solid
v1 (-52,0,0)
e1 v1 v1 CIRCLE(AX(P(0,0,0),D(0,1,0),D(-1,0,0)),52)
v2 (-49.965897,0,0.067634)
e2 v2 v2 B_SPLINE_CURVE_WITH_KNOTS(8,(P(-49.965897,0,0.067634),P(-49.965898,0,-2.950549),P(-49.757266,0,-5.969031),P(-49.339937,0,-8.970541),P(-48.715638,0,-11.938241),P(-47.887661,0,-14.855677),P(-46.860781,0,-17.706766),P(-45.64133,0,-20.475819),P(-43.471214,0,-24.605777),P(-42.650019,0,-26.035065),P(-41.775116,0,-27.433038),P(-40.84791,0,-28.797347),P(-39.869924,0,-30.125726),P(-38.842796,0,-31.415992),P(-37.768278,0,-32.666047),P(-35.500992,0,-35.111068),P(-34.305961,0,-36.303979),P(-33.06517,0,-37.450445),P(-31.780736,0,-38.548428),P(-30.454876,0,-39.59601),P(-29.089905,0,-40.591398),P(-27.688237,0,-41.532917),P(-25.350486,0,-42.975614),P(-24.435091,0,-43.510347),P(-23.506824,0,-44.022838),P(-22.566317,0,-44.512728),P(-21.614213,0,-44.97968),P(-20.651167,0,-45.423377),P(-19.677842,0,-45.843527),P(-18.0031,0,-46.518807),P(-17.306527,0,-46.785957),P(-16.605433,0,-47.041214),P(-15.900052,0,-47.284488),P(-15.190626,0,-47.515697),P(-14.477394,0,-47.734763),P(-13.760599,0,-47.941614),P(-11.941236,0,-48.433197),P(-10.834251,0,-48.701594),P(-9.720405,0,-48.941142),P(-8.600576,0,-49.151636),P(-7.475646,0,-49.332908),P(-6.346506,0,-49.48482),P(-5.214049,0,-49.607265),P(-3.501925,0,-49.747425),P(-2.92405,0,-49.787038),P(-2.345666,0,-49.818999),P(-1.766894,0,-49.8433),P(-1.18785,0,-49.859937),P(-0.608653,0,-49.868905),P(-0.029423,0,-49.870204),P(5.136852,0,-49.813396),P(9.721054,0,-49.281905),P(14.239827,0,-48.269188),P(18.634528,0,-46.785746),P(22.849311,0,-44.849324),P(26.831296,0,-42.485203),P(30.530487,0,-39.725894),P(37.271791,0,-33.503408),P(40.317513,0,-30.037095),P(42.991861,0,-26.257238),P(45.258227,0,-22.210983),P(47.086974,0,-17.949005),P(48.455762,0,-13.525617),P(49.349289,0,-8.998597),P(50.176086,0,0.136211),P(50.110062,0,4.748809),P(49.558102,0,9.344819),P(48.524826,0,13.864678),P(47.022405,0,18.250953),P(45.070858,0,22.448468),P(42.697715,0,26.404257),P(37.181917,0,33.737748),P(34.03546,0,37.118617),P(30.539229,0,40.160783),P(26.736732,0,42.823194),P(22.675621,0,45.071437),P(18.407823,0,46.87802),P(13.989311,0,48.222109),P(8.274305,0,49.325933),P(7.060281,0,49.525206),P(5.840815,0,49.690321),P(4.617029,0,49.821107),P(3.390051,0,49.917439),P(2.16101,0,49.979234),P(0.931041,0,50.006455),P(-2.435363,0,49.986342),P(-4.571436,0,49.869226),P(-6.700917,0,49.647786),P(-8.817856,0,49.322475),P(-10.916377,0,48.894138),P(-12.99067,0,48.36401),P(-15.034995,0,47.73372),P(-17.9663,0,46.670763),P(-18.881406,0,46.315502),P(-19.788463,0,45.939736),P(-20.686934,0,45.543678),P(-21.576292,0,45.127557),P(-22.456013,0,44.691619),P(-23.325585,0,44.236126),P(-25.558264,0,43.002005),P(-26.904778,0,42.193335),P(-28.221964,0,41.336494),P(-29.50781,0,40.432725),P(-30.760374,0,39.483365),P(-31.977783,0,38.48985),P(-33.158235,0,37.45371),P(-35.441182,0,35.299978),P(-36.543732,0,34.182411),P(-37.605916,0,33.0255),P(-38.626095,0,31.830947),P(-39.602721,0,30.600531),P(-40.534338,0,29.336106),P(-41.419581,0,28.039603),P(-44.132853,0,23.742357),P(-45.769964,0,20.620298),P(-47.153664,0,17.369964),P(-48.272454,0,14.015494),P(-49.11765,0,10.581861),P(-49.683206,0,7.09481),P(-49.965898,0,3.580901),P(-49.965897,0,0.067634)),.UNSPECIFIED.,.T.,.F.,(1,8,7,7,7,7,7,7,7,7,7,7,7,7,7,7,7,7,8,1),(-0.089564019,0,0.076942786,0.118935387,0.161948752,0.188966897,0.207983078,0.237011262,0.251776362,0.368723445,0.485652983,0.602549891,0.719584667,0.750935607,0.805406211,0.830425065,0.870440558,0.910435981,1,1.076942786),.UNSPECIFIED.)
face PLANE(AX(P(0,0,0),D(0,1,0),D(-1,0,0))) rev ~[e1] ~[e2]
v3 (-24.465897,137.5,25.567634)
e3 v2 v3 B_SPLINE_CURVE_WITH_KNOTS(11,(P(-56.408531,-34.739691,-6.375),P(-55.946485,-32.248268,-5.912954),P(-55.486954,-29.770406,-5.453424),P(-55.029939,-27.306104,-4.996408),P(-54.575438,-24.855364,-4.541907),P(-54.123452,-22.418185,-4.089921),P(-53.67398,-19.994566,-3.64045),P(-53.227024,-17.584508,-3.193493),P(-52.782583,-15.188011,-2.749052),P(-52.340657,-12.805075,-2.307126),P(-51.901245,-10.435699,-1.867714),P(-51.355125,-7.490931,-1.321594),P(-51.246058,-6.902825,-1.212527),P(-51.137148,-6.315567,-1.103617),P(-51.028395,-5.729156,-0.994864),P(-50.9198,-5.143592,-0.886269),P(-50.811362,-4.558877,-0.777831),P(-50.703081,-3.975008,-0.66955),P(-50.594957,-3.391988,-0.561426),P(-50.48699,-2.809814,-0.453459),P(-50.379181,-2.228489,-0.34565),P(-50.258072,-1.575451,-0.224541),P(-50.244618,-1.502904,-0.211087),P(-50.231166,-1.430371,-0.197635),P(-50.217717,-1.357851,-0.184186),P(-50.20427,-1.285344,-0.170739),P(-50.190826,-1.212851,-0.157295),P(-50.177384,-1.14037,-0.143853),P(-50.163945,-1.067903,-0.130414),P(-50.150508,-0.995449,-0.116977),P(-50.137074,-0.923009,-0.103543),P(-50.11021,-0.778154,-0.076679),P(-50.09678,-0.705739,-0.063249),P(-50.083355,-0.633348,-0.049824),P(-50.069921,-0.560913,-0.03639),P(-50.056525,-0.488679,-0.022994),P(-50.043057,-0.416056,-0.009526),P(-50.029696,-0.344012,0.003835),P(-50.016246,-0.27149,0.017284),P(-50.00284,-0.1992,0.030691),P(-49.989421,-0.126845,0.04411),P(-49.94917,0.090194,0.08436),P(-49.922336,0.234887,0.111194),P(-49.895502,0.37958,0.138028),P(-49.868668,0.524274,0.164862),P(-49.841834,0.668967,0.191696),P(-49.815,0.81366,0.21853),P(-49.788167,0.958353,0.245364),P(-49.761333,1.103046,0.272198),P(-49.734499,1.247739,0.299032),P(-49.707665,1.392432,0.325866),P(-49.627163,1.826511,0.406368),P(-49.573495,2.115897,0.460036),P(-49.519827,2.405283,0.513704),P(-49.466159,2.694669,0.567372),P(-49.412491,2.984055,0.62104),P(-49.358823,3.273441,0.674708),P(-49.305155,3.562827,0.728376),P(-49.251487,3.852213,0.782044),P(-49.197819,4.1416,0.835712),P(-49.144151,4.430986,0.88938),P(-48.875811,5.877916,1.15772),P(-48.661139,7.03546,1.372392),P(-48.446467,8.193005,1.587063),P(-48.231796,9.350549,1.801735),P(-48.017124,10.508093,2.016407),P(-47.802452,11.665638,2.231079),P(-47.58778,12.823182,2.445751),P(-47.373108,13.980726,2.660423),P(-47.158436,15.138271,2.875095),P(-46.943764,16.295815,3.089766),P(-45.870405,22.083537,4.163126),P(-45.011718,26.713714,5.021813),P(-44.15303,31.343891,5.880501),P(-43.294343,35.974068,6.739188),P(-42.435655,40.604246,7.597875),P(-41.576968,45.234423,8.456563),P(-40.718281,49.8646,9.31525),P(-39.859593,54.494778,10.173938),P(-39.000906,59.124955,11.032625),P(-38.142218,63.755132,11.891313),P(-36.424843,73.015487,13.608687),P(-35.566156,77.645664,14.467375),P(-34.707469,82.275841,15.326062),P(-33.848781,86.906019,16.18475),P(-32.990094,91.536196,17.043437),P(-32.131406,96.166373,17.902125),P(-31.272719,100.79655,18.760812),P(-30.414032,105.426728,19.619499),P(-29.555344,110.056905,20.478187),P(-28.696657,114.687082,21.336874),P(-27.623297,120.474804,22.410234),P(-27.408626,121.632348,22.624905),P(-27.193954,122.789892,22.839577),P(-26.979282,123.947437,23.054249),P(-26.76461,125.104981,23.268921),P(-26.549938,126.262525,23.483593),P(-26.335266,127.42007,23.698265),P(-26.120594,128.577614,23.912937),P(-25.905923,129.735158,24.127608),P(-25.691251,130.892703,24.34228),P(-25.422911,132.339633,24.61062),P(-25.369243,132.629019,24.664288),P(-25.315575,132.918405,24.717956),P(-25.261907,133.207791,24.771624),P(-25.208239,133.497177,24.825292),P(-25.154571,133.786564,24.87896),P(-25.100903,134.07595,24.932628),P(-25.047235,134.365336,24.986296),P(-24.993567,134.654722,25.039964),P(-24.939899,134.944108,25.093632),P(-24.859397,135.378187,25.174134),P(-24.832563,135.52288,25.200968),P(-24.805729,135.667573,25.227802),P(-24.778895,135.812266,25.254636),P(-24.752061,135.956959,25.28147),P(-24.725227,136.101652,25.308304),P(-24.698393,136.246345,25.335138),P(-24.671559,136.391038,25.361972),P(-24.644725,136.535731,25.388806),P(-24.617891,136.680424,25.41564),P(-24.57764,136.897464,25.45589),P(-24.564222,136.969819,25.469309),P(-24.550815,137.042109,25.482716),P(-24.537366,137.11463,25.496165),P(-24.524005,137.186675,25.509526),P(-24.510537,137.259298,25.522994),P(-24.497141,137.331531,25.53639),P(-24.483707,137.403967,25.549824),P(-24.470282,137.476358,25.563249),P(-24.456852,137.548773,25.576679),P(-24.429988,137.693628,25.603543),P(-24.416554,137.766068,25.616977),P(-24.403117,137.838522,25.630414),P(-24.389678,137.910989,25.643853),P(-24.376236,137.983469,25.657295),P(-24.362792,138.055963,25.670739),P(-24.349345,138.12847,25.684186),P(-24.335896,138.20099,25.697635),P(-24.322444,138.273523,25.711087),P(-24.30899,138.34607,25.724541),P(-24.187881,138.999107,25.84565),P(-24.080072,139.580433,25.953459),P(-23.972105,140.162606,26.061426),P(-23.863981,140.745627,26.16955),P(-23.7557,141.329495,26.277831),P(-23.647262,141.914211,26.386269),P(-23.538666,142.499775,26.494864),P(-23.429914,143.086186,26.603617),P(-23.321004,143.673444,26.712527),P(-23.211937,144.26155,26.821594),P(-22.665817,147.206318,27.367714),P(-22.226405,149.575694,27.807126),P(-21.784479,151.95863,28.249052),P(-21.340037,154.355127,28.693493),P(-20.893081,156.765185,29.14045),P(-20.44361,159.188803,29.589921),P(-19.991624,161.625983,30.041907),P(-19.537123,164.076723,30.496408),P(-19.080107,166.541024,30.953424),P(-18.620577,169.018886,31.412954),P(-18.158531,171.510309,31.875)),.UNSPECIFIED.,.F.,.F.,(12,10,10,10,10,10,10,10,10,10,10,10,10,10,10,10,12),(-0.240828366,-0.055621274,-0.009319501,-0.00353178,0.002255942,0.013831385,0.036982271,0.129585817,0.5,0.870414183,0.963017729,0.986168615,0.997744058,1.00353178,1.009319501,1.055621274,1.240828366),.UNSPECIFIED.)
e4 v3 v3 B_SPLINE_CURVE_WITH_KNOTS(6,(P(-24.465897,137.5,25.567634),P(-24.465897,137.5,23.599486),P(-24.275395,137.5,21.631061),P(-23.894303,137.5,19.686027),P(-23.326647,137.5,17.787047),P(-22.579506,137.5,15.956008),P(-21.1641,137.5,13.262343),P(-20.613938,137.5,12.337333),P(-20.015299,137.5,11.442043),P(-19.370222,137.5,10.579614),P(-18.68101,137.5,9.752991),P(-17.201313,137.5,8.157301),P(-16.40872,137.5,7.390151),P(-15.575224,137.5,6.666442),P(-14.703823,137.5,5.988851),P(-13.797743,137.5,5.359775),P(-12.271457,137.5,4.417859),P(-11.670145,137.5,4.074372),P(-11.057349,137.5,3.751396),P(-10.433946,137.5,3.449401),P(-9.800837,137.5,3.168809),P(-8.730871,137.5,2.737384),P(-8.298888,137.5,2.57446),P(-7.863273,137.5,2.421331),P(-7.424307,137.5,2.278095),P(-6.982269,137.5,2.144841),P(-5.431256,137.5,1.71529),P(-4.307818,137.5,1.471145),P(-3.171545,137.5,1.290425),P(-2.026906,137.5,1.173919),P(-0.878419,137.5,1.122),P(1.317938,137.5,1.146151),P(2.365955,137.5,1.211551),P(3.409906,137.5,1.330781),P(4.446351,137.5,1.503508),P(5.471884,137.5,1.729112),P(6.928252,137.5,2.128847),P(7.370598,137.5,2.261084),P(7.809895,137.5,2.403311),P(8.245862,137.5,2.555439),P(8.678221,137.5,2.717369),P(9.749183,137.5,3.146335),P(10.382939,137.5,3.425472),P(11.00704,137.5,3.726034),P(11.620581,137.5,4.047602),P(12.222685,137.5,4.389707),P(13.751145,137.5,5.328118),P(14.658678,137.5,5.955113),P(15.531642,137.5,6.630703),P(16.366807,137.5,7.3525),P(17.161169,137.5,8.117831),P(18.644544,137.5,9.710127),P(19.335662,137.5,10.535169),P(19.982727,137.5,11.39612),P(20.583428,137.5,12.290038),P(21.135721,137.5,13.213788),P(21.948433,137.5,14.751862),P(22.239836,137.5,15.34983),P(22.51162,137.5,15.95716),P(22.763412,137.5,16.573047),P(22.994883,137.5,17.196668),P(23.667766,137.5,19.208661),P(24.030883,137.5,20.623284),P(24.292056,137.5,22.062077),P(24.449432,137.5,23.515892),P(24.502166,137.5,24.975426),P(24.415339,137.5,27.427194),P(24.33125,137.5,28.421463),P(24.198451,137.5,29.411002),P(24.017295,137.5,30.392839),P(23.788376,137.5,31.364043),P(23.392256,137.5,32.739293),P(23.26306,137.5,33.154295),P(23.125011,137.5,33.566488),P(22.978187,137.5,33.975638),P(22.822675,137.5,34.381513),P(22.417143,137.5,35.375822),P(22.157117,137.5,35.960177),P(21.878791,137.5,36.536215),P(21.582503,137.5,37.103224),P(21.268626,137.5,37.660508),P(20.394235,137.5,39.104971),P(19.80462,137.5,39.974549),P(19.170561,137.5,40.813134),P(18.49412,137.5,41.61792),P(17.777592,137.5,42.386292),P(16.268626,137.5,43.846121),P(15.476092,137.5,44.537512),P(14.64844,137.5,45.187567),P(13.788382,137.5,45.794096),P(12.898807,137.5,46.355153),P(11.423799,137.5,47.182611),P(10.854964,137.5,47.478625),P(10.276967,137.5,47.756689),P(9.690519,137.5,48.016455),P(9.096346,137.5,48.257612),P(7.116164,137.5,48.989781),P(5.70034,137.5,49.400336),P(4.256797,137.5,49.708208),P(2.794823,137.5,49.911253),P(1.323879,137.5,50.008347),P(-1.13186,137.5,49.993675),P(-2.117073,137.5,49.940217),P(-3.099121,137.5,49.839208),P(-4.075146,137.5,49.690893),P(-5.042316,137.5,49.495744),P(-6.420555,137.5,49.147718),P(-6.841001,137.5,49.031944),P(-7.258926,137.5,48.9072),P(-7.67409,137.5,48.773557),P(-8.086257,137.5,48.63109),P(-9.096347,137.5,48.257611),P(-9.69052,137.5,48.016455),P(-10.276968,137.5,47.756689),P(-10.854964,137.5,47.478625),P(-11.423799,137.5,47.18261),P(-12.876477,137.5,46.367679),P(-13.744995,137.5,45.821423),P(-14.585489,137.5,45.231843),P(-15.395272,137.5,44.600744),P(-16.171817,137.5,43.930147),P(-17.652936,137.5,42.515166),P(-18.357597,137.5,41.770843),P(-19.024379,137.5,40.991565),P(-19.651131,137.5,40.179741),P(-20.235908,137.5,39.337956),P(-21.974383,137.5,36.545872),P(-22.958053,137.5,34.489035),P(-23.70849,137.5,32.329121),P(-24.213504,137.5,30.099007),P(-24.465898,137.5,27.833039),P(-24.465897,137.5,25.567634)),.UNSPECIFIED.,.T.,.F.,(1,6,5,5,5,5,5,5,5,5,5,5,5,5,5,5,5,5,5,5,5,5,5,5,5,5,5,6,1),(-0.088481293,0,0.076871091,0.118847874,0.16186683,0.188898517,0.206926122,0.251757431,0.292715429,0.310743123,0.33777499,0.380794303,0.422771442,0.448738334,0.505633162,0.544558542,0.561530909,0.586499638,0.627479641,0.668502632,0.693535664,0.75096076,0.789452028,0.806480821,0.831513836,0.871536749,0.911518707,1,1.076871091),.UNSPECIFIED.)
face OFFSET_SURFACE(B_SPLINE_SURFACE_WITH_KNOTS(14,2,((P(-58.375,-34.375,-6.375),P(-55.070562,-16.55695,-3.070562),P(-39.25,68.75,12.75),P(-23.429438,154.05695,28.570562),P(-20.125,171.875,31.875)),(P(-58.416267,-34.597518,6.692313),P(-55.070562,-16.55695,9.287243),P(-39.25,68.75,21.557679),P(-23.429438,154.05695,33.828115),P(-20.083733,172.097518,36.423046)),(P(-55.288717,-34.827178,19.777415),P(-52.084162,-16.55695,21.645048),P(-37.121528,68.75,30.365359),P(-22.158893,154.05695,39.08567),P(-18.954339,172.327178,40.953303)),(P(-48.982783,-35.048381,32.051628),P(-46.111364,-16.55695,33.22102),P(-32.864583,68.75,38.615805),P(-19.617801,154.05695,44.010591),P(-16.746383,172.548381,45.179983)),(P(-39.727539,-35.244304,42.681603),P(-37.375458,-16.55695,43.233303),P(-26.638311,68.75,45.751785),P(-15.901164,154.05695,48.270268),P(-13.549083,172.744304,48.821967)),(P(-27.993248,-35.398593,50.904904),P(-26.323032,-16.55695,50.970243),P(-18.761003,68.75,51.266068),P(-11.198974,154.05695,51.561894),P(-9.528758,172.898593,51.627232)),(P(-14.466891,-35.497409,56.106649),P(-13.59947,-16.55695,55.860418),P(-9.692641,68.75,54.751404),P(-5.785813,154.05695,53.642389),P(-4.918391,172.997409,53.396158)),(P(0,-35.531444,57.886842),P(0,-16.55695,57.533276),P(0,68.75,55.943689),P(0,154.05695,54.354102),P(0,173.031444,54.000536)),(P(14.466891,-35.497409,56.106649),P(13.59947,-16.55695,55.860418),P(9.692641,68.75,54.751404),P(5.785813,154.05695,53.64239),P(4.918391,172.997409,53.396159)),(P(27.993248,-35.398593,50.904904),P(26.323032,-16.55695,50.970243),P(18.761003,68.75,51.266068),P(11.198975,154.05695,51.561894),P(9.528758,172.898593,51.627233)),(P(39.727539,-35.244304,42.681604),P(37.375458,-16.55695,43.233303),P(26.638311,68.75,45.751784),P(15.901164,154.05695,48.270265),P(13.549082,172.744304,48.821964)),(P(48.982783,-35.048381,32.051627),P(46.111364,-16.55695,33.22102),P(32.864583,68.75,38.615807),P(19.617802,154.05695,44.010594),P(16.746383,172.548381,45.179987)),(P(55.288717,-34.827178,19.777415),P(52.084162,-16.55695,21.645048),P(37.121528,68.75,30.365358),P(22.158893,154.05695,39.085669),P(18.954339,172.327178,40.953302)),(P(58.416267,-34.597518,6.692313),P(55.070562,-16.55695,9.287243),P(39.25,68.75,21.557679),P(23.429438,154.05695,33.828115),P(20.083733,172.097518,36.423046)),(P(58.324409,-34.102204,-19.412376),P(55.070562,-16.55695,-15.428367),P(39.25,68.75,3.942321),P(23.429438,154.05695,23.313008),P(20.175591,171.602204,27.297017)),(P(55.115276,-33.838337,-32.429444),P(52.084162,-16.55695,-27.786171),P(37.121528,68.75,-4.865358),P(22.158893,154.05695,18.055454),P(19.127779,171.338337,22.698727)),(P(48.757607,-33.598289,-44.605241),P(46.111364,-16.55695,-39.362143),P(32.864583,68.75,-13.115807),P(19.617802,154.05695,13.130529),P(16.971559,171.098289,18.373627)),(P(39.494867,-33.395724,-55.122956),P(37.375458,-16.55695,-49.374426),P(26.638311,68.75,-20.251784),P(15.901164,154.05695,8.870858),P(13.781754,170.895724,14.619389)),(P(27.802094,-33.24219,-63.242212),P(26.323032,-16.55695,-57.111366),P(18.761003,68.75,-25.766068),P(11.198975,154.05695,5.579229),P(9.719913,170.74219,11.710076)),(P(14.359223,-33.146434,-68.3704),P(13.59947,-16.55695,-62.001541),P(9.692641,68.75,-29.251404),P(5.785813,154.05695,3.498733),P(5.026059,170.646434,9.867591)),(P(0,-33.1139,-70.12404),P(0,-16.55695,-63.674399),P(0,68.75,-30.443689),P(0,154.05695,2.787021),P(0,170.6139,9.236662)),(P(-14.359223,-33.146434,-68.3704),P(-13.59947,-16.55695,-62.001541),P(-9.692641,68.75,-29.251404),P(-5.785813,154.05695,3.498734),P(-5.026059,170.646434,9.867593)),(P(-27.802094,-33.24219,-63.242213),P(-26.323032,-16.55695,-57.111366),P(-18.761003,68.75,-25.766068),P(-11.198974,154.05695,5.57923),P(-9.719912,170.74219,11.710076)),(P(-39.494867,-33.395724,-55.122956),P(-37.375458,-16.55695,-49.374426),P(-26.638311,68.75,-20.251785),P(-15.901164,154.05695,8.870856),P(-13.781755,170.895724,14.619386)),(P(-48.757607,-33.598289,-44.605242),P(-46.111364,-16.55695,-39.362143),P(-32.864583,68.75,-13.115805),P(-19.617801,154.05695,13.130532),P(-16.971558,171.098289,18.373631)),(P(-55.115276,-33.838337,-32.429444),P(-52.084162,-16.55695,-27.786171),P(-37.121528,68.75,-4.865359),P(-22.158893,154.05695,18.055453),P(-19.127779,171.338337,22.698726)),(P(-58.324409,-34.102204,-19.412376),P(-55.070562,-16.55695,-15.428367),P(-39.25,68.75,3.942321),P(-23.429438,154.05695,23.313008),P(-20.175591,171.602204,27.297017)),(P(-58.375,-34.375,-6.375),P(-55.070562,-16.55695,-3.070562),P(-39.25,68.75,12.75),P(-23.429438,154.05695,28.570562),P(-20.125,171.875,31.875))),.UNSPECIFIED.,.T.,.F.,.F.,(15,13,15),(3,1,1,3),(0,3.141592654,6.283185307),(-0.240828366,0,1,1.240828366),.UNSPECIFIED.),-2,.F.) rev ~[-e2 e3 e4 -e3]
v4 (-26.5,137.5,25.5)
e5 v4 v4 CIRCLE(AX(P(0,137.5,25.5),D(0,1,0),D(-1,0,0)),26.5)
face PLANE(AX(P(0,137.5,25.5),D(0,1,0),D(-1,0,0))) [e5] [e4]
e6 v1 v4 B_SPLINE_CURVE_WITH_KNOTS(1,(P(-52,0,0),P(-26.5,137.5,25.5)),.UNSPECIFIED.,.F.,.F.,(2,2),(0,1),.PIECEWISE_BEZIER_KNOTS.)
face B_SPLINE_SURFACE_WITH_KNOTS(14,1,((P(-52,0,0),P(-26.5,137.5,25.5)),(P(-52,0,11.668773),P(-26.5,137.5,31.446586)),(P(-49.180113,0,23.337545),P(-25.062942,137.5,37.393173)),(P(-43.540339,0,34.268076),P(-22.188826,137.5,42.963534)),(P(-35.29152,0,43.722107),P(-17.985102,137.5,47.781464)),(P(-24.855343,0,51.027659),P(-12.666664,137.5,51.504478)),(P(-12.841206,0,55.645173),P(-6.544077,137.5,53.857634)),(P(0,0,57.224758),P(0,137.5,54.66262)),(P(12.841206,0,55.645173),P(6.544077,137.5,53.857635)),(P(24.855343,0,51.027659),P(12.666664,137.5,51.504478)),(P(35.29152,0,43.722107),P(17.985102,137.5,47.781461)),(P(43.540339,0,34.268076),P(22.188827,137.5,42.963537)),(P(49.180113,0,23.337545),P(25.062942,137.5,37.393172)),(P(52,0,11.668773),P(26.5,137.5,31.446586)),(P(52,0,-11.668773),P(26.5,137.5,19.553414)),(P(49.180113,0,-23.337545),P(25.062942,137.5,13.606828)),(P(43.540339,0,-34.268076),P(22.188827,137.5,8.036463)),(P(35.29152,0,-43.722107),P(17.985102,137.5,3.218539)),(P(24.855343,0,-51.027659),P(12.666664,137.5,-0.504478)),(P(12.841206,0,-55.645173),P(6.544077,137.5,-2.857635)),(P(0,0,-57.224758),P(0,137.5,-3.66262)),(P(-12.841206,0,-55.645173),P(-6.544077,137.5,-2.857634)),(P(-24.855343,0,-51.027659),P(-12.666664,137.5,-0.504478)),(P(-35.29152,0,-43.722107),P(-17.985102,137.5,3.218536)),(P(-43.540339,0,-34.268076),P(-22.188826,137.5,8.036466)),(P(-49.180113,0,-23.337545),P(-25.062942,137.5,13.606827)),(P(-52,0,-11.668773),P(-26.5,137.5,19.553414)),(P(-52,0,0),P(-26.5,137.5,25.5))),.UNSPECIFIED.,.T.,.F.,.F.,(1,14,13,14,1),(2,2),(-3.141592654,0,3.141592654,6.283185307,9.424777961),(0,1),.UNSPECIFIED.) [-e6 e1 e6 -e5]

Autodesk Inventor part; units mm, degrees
ref_plane "YZ Plane" through (0, 0, 0) normal (1, 0, 0) x (0, 1, 0)
ref_plane "XY Plane" through (0, 0, 0) normal (0, 0, 1) x (1, 0, 0)
sketch "Szkic6" plane through (0, 0, 0) normal (0, 1, 0) x (-1, 0, 0)
  circle A0 centre (0, 0) radius 52
  dimension "d33" = 104
ref_plane "Płaszczyzna konstrukcyjna1" through (0, 137.5, 0) normal (0, 1, 0) x (-1, 0, 0)
sketch "Szkic7" plane through (0, 137.5, 0) normal (0, 1, 0) x (-1, 0, 0)
  circle A0 centre (0, 25.5) radius 26.5
  line L0 (0, -20.3) -> (0, 20.3) construction
  circle A1 centre (0, 0) radius 52 construction
  dimension "d35" = 53
loft "Wyciągnięcie złożone1" add profiles "Szkic6", "Szkic7"
shell "Skorupa1" thickness 2 removed faces 2 at (-1.8199, 137.5, 22.9501) at (-18.5271, 0, 25.061)
equation "\"d33\" = OD1"
equation "\"d35\" = OD2"
equation "\"d52\" = THK"
equation "\"SzerokośćGięciaPodcięcia\" = Grubość"
equation "\"RozmiarPodcięciaNarożnika\" = 4 * Grubość"
equation "\"PromieńPrzejścia\" = PromieńGięcia"
equation "\"Rozmiar_promienia_Jacobiego\" = PromieńGięcia"
equation "\"Wielk_odstępu\" = Grubość"
equation "\"d2\" = PromieńGięcia"
equation "\"d23\" = PromieńGięcia"
equation "\"OD1\" = 104"
equation "\"OD2\" = 53"
equation "\"L\" = 137.5"
equation "\"THK\" = 2"
equation "\"d34\" = L"
equation "\"Grubość\" = 1.5"
equation "\"PromieńGięcia\" = 3"
properties part number "Redukcja asymetryczna Ø104x53x2 L=137,5" material "304"
